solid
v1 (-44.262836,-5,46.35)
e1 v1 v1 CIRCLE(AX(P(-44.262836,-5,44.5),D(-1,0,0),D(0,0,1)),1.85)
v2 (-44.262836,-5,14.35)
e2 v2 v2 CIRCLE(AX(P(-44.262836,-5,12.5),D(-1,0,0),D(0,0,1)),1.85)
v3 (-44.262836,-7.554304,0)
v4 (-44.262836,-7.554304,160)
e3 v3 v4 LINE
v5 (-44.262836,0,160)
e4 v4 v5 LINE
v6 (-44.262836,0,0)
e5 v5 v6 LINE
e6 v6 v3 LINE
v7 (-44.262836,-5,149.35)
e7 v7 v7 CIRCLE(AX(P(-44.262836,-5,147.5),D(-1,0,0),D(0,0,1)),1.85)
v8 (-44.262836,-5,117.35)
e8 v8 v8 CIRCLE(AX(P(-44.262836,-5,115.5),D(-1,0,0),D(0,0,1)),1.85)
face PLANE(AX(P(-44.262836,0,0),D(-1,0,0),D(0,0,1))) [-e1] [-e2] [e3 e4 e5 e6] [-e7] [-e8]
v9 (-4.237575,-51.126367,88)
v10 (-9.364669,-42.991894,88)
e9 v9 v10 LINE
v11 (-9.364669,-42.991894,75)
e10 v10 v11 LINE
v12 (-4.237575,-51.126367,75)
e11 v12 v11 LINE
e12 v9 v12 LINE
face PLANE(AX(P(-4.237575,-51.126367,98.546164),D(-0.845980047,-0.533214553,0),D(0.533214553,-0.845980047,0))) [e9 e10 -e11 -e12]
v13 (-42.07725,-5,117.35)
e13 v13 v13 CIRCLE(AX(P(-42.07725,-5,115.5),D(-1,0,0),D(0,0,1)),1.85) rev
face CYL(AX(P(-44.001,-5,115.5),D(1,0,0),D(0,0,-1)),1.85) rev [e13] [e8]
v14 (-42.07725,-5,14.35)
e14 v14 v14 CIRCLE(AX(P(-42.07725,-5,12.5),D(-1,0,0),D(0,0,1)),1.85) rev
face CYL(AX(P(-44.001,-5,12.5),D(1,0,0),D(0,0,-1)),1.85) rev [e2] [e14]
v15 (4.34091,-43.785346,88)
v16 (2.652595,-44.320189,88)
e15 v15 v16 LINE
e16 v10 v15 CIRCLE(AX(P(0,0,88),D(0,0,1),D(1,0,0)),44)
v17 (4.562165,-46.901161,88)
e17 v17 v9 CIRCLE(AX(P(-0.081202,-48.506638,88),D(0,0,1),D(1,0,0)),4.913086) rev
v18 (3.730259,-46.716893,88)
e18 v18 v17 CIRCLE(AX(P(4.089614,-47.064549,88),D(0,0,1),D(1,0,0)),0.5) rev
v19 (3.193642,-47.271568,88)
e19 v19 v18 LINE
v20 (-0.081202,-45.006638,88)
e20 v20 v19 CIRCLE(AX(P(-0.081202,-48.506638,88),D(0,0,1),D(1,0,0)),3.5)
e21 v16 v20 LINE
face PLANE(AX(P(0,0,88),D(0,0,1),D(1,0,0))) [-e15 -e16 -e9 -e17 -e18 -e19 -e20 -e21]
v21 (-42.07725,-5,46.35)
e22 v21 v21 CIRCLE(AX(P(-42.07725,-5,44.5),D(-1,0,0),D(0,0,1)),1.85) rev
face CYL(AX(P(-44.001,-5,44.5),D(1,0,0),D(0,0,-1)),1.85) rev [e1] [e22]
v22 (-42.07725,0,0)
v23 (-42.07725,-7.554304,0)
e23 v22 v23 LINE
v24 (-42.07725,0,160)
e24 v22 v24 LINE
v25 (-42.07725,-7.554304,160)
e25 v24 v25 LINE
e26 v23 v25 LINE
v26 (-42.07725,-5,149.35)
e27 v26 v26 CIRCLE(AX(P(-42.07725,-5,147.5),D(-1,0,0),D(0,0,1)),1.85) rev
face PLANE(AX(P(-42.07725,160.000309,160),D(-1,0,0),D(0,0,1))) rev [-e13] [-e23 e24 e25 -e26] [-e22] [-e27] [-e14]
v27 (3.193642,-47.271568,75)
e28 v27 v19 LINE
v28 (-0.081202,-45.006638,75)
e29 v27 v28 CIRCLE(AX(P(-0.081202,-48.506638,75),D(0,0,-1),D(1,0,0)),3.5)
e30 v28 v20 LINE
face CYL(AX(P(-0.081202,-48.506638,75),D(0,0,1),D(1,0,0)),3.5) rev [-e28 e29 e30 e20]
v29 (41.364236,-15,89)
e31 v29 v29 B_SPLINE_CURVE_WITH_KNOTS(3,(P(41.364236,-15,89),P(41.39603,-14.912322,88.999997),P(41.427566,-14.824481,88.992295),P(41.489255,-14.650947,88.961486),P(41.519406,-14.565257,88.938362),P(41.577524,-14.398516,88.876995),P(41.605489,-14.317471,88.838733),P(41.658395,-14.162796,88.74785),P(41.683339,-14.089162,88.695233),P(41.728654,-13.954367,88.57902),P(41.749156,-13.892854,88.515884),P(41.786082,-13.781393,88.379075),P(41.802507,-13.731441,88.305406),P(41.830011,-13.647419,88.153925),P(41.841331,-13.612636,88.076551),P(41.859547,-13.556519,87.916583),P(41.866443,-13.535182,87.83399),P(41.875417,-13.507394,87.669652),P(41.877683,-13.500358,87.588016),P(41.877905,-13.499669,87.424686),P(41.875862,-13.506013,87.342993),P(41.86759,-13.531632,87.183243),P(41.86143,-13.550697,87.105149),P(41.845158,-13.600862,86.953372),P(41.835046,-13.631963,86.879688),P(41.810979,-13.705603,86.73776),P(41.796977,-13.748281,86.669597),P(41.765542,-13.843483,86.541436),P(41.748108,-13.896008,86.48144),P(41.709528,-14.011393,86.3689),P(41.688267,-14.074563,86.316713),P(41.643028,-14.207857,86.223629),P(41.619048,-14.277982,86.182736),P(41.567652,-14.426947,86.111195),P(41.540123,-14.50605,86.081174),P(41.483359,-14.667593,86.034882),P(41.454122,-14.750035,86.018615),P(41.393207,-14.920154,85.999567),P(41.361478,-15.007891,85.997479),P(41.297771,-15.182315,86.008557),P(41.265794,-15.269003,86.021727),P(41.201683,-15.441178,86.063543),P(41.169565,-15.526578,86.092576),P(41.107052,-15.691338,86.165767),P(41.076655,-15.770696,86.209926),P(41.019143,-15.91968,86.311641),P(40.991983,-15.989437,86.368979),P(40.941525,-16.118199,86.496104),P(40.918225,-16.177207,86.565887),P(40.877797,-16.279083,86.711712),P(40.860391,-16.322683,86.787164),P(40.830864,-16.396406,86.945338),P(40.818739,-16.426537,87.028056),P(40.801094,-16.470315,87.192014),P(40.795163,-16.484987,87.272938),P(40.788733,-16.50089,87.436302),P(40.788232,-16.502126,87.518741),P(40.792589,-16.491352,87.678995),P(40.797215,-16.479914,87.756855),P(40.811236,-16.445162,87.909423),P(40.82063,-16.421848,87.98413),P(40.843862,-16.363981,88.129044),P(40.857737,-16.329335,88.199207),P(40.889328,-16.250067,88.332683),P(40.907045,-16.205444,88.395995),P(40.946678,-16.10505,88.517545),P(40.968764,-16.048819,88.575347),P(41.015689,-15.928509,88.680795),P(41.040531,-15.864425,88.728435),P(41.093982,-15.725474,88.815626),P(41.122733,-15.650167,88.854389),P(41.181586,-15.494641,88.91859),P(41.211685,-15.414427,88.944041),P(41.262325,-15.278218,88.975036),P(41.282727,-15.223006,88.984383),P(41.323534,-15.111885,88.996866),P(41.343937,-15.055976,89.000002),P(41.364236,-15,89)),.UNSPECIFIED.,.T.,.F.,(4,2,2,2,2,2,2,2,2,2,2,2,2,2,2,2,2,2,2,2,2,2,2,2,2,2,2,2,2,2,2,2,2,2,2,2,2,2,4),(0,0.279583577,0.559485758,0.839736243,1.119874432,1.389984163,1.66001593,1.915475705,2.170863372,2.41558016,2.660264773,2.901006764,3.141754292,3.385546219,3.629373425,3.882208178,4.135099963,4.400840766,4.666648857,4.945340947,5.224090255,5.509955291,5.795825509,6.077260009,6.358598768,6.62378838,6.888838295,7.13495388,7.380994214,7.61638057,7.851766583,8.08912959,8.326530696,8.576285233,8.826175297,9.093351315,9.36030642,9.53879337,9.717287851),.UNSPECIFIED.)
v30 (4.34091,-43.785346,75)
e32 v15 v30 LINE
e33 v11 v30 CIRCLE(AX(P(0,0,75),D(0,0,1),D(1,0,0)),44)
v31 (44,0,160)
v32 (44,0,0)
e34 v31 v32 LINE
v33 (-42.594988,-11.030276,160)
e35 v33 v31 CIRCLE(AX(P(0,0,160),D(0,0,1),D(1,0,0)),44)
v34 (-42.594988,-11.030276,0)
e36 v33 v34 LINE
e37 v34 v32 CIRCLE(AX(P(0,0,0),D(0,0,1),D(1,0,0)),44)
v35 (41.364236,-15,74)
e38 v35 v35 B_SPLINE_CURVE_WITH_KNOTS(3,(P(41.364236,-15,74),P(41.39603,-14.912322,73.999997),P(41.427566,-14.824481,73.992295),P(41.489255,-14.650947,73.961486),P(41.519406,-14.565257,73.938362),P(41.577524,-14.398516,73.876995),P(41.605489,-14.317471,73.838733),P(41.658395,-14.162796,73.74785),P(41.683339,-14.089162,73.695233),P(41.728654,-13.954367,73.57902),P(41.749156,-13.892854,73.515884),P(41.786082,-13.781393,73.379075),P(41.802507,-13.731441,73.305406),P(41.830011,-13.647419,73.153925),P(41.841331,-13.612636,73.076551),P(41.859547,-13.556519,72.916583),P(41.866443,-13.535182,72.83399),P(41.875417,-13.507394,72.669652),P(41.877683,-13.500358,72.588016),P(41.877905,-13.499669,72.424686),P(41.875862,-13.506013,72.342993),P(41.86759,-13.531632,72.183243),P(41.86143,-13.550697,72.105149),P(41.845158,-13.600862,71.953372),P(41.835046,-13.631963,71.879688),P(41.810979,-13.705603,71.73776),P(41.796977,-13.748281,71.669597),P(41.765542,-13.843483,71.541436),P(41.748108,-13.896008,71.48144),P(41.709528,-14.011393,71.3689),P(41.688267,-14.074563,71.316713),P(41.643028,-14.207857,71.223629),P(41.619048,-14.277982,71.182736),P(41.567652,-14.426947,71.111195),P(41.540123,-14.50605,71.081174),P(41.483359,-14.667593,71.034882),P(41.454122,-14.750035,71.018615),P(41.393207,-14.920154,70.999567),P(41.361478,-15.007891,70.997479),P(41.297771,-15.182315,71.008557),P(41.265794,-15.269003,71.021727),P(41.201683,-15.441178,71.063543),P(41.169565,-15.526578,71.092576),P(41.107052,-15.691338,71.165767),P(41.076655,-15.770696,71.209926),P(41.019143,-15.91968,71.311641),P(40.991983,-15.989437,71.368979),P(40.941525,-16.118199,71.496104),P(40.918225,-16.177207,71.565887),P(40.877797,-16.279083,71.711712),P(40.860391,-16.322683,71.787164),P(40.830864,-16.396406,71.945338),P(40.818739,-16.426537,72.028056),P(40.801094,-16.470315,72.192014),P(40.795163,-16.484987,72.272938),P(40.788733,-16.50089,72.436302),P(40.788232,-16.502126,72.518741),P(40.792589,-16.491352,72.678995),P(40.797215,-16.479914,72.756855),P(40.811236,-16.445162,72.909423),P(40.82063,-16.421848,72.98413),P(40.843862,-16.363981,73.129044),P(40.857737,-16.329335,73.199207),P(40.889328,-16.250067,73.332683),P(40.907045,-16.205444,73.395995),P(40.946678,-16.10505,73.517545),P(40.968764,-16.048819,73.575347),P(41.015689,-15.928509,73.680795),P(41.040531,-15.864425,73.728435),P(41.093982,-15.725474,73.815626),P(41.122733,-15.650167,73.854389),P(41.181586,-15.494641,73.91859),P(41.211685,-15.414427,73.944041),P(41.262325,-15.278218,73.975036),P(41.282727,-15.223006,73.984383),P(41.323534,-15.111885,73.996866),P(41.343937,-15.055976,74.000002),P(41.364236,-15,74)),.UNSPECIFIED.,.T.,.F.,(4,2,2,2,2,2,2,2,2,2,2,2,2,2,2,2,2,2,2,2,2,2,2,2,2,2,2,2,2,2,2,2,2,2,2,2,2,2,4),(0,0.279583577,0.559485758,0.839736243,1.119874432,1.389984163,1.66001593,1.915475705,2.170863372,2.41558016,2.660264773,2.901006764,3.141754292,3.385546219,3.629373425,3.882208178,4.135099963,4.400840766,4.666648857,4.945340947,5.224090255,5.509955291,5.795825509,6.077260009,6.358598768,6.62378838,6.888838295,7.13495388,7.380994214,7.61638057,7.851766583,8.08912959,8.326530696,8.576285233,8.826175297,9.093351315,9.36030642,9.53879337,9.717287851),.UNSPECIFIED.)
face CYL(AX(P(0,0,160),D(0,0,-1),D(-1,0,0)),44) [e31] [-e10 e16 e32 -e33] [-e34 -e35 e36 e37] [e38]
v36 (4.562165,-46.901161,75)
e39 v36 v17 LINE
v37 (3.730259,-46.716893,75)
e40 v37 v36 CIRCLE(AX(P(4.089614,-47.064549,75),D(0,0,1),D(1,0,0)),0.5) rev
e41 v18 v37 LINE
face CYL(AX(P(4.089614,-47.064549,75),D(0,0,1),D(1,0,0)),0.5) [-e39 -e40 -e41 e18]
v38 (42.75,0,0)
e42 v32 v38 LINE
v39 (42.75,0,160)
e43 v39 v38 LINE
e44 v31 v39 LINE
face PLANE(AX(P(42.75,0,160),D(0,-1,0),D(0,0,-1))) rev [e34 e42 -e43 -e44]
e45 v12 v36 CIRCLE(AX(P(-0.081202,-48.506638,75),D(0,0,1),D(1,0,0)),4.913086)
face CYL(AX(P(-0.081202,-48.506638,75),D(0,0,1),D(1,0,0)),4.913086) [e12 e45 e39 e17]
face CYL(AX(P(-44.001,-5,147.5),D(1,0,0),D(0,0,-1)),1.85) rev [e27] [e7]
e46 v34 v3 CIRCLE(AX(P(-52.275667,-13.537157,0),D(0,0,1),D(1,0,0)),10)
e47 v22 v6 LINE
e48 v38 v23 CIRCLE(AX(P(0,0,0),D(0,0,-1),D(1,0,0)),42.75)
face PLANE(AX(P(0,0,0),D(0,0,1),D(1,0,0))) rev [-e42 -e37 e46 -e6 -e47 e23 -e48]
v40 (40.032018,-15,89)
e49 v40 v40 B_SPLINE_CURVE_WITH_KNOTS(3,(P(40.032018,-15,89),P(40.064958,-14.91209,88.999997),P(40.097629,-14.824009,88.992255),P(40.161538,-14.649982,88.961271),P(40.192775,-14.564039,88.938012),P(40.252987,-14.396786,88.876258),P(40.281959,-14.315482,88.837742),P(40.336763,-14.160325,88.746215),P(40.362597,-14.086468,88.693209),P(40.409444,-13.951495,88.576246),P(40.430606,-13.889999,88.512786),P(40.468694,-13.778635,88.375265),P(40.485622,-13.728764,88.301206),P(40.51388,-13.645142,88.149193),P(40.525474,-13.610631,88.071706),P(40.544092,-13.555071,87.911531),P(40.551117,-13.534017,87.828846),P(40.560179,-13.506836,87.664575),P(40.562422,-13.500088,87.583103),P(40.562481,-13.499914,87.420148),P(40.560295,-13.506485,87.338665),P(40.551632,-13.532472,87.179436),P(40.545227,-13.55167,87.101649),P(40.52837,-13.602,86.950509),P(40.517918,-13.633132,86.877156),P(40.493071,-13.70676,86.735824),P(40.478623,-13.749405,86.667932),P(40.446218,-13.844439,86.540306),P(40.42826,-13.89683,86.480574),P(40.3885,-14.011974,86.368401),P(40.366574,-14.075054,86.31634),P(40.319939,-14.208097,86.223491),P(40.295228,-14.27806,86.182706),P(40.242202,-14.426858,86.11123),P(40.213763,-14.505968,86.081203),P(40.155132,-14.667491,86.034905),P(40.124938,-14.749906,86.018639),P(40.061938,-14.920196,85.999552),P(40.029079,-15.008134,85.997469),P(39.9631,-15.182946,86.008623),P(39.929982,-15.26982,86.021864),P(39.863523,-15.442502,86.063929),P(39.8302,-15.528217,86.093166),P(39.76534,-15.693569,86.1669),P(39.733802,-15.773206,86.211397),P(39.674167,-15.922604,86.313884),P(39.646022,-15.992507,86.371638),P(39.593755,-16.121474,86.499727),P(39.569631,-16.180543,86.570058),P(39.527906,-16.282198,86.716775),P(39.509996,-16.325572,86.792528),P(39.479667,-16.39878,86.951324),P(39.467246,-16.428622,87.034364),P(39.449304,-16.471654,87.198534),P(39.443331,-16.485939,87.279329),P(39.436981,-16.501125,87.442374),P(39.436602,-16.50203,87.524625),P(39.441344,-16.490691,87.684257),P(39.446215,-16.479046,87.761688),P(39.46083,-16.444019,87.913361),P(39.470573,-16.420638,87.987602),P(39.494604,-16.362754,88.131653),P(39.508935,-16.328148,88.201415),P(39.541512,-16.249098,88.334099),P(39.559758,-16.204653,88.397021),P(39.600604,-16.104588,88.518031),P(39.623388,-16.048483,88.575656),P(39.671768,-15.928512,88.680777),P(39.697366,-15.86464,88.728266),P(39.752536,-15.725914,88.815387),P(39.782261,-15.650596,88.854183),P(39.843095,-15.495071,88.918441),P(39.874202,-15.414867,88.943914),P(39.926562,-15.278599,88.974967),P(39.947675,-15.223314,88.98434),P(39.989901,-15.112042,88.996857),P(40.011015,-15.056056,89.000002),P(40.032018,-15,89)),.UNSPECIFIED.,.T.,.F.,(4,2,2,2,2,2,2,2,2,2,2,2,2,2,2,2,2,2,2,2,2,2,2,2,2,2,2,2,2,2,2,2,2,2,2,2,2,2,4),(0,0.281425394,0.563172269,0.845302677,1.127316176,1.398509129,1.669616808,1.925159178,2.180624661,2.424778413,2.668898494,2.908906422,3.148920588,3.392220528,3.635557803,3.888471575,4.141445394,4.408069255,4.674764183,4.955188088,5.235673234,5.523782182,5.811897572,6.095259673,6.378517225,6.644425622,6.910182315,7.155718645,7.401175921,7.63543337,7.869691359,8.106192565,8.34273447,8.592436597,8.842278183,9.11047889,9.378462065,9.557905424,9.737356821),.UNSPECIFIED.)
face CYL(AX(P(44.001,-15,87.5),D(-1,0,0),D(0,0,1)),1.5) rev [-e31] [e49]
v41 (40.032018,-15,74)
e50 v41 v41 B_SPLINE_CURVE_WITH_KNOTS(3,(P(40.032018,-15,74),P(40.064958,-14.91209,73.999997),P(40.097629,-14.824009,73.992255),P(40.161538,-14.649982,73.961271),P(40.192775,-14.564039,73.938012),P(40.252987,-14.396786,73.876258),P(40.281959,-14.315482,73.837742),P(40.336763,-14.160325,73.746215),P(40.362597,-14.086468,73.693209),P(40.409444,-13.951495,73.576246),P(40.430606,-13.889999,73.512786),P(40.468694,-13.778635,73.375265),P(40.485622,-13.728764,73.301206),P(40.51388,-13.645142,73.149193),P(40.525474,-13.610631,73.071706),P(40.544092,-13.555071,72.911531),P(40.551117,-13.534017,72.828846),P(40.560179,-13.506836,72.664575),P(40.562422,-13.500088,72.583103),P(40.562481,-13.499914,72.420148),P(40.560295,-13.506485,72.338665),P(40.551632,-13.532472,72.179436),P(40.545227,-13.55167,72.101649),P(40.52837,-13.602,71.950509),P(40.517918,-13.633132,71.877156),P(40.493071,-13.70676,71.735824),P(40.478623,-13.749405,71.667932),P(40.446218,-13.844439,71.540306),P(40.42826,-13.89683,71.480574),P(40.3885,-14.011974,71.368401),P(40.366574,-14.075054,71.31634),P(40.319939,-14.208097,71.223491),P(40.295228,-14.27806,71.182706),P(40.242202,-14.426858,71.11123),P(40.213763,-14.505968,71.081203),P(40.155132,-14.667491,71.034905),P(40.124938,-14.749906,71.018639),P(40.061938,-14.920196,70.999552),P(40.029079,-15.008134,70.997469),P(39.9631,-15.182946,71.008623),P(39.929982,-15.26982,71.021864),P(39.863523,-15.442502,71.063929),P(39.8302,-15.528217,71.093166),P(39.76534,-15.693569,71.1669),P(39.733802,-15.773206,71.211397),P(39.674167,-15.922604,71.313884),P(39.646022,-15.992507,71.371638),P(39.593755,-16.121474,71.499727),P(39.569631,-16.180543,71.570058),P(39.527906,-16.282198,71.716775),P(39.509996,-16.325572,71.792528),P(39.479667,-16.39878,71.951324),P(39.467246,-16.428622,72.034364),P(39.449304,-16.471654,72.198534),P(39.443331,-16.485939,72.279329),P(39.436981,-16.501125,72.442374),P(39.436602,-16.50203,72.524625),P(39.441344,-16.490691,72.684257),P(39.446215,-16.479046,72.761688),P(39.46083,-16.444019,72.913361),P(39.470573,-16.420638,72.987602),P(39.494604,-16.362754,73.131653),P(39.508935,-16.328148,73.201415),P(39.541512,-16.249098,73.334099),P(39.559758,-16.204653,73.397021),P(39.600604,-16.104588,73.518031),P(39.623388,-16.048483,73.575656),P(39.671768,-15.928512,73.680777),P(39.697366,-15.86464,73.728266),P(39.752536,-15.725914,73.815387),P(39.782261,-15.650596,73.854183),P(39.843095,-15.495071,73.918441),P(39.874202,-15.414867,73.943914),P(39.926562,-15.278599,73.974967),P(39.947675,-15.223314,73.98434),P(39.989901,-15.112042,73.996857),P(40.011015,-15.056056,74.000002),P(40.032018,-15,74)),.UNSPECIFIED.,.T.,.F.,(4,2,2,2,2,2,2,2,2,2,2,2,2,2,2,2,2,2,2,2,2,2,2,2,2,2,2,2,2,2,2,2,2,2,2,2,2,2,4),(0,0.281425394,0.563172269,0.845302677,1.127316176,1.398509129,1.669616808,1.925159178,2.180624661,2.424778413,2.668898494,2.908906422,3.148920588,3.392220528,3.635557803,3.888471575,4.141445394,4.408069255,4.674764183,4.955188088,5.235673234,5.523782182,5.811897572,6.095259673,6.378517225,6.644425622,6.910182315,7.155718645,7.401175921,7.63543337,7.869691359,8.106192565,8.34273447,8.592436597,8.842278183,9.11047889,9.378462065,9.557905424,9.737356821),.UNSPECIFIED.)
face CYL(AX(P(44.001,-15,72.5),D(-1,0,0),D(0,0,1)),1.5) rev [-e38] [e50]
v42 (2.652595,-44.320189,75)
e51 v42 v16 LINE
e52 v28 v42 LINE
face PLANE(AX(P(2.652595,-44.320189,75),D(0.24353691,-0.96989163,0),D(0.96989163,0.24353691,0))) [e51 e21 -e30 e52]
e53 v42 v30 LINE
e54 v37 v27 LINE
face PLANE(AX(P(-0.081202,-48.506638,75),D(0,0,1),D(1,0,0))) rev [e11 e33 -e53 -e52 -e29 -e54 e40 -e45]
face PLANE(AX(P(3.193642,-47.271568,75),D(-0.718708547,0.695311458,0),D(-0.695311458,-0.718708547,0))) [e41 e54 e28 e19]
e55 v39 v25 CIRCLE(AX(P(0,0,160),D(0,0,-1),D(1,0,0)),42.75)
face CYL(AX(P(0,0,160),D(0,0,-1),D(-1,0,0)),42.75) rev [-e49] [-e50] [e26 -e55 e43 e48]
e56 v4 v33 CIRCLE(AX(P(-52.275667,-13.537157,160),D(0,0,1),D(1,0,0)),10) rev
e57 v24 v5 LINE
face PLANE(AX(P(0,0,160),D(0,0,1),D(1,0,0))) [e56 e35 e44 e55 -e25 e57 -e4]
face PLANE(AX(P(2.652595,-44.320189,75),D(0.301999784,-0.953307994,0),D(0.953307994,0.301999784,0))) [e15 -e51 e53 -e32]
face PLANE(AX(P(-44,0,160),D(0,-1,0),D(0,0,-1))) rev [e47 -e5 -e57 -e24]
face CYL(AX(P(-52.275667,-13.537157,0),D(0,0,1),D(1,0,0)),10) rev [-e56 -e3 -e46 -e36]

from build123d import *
from build123d.topology import SkipClean

# Parameters (mm, degrees)
BOSS_EXTRUDE1_DEPTH      = 160
CUT_EXTRUDE1_REACH       = 173.674
CUT_EXTRUDE1_END_RADIUS  = 44
SKETCH2_R                = 1.85
BOSS_EXTRUDE2_DEPTH      = 7.5
BOSS_EXTRUDE2_DEPTH_BACK = 7.5
CUT_EXTRUDE2_START       = -160
SKETCH5_W                = 1.237164205
SKETCH5_H                = 7.554303916
CUT_EXTRUDE2_DEPTH       = 160
SKETCH6_W                = 160
SKETCH6_H                = 7.554303916
SKETCH6_R                = 1.85
BOSS_EXTRUDE3_DEPTH      = 0.5
BOSS_EXTRUDE4_DEPTH      = 85
FILLET3_R                = 0.5
CUT_EXTRUDE4_REACH       = 176.326
CUT_EXTRUDE4_END_RADIUS  = 44
SKETCH9_W                = 12
SKETCH9_H                = 6
CUT_EXTRUDE5_DEPTH       = 72
CUT_EXTRUDE6_START       = -160
CUT_EXTRUDE6_DEPTH       = 160
BOSS_EXTRUDE5_DEPTH      = 1
BOSS_EXTRUDE5_DEPTH_BACK = 1.5
SKETCH14_W               = 160
SKETCH14_H               = 7.554303916
SKETCH14_R               = 1.85
SKETCH17_W               = 0.3144145
SKETCH17_H               = 160
CUT_EXTRUDE8_DEPTH       = 7.554303916
FILLET4_R                = 10
SKETCH18_W               = 5.679513367
SKETCH18_H               = 15.054755776
CUT_EXTRUDE9_DEPTH       = 15
CUT_EXTRUDE10_REACH      = 211.375
CUT_EXTRUDE10_END_RADIUS = 44
CUT_EXTRUDE10_START      = 20
SKETCH19_R               = 1.5
BOSS_EXTRUDE6_DEPTH      = 13


with BuildPart() as part:
    # Sketch1 → Boss-Extrude1 (new body)
    with BuildSketch(Plane.XY):
        with BuildLine():
            Line((-44, 0), (-42.75, 0))
            ThreePointArc((-42.75, 0), (0, -42.75), (42.75, 0))
            Line((42.75, 0), (44, 0))
            ThreePointArc((44, 0), (0, -44), (-44, 0))
        make_face()
    extrude(amount=BOSS_EXTRUDE1_DEPTH)

    # Cut-Extrude1: up to this cylinder (the profile starts inside it)
    cut_extrude1_end = Plane(origin=(0, 0, 80), z_dir=(0, 0, -1)) * Cylinder(CUT_EXTRUDE1_END_RADIUS, 571.348, mode=Mode.PRIVATE)
    # Sketch2 → Cut-Extrude1 (cut, up to the surface)
    with BuildSketch(Plane(origin=(0, 0, 0), x_dir=(0, 0, -1), z_dir=(1, 0, 0)), mode=Mode.PRIVATE) as cut_extrude1_sk1:
        with Locations((-147.5, -5)):
            Circle(SKETCH2_R)
    cut_extrude1_tool1 = extrude(cut_extrude1_sk1.sketch, amount=-CUT_EXTRUDE1_REACH, mode=Mode.PRIVATE) & cut_extrude1_end
    add(cut_extrude1_tool1.solids().sort_by_distance((0, -5, 147.5))[0], mode=Mode.SUBTRACT)
    # Sketch2 → Cut-Extrude1 (cut, up to the surface)
    with BuildSketch(Plane(origin=(0, 0, 0), x_dir=(0, 0, -1), z_dir=(1, 0, 0)), mode=Mode.PRIVATE) as cut_extrude1_sk2:
        with Locations((-115.5, -5)):
            Circle(SKETCH2_R)
    cut_extrude1_tool2 = extrude(cut_extrude1_sk2.sketch, amount=-CUT_EXTRUDE1_REACH, mode=Mode.PRIVATE) & cut_extrude1_end
    add(cut_extrude1_tool2.solids().sort_by_distance((0, -5, 115.5))[0], mode=Mode.SUBTRACT)
    # Sketch2 → Cut-Extrude1 (cut, up to the surface)
    with BuildSketch(Plane(origin=(0, 0, 0), x_dir=(0, 0, -1), z_dir=(1, 0, 0)), mode=Mode.PRIVATE) as cut_extrude1_sk3:
        with Locations((-44.5, -5)):
            Circle(SKETCH2_R)
    cut_extrude1_tool3 = extrude(cut_extrude1_sk3.sketch, amount=-CUT_EXTRUDE1_REACH, mode=Mode.PRIVATE) & cut_extrude1_end
    add(cut_extrude1_tool3.solids().sort_by_distance((0, -5, 44.5))[0], mode=Mode.SUBTRACT)
    # Sketch2 → Cut-Extrude1 (cut, up to the surface)
    with BuildSketch(Plane(origin=(0, 0, 0), x_dir=(0, 0, -1), z_dir=(1, 0, 0)), mode=Mode.PRIVATE) as cut_extrude1_sk4:
        with Locations((-12.5, -5)):
            Circle(SKETCH2_R)
    cut_extrude1_tool4 = extrude(cut_extrude1_sk4.sketch, amount=-CUT_EXTRUDE1_REACH, mode=Mode.PRIVATE) & cut_extrude1_end
    add(cut_extrude1_tool4.solids().sort_by_distance((0, -5, 12.5))[0], mode=Mode.SUBTRACT)

    # Sketch4 → Boss-Extrude2 (add, two sides: drawn at the far end of the back side and taken through both)
    with SkipClean():  # the faces are left unmerged after this step: merging them gives an invalid solid
        with BuildSketch(Plane(origin=(0, 0, 72), x_dir=(-1, 0, 0), z_dir=(0, 0, -1)).offset(-BOSS_EXTRUDE2_DEPTH_BACK)):
            with BuildLine():
                Line((-42.188440557, 12.495418496), (-40.883089617, 12.495418496))
                ThreePointArc((-40.883089617, 12.495418496), (-42.280696429, 6.317057024), (-42.75, 0))
                Line((-42.75, 0), (-44, 0))
                ThreePointArc((-44, 0), (-43.544755049, 6.31302683), (-42.188440557, 12.495418496))
            make_face()
        extrude(amount=BOSS_EXTRUDE2_DEPTH + BOSS_EXTRUDE2_DEPTH_BACK)

    # Sketch5 → Cut-Extrude2 (cut)
    with SkipClean():  # the faces are left unmerged after this step: merging them gives an invalid solid
        with BuildSketch(Plane.XY.offset(160).offset(CUT_EXTRUDE2_START)):
            with Locations((-43.381417898, -3.777151958)):
                Rectangle(SKETCH5_W, SKETCH5_H)
        extrude(amount=CUT_EXTRUDE2_DEPTH, mode=Mode.SUBTRACT)

    # Sketch6 → Boss-Extrude3 (add)
    with SkipClean():  # the faces are left unmerged after this step: merging them gives an invalid solid
        with BuildSketch(Plane.ZY.offset(42.762835795)):
            with Locations((80, -3.777151958)):
                Rectangle(SKETCH6_W, SKETCH6_H)
            with Locations((12.5, -5)):
                Circle(SKETCH6_R, mode=Mode.SUBTRACT)
            with Locations((44.5, -5)):
                Circle(SKETCH6_R, mode=Mode.SUBTRACT)
            with Locations((115.5, -5)):
                Circle(SKETCH6_R, mode=Mode.SUBTRACT)
            with Locations((147.5, -5)):
                Circle(SKETCH6_R, mode=Mode.SUBTRACT)
        extrude(amount=BOSS_EXTRUDE3_DEPTH)

    # Sketch7 → Boss-Extrude4 (add)
    with SkipClean():  # the faces are left unmerged after this step: merging them gives an invalid solid
        with BuildSketch(Plane.XY.offset(160)):
            with BuildLine():
                Line((3.193641617, -47.271567965), (4.247348412, -46.182404151))
                ThreePointArc((4.247348412, -46.182404151), (-1.361382554, -53.250007087), (-2.652595344, -44.320189404))
                Line((-2.652595344, -44.320189404), (-7.064595581, -42.922505627))
                ThreePointArc((-7.064595581, -42.922505627), (0, -43.5), (7.064595581, -42.922505627))
                Line((7.064595581, -42.922505627), (2.652595344, -44.320189404))
                Line((2.652595344, -44.320189404), (-0.081202248, -45.006637866))
                ThreePointArc((-0.081202248, -45.006637866), (-2.072088401, -51.385243836), (3.193641617, -47.271567965))
            make_face()
        extrude(amount=-BOSS_EXTRUDE4_DEPTH)

    # Fillet3
    fillet3_edges = [part.edges().sort_by_distance(p)[0] for p in [
        (4.247348412, -46.182404151, 117.5),
    ]]
    fillet(fillet3_edges, radius=FILLET3_R)

    # Cut-Extrude4: up to this cylinder (the profile starts inside it)
    with SkipClean():  # the faces are left unmerged after this step: merging them gives an invalid solid
        cut_extrude4_end = Plane(origin=(0, 0, 72), z_dir=(0, 0, -1)) * Cylinder(CUT_EXTRUDE4_END_RADIUS, 441.652, mode=Mode.PRIVATE)
        # Sketch9 → Cut-Extrude4 (cut, up to the surface)
        with BuildSketch(Plane(origin=(0, 0, 0), x_dir=(0, 0, -1), z_dir=(1, 0, 0)), mode=Mode.PRIVATE) as cut_extrude4_sk1:
            with Locations((-72, 5.495418496)):
                Rectangle(SKETCH9_W, SKETCH9_H)
        cut_extrude4_tool1 = extrude(cut_extrude4_sk1.sketch, amount=CUT_EXTRUDE4_REACH, mode=Mode.PRIVATE) & cut_extrude4_end
        add(cut_extrude4_tool1.solids().sort_by_distance((0, 5.495418, 72))[0], mode=Mode.SUBTRACT)

    # Sketch11 → Cut-Extrude5 (cut)
    with SkipClean():  # the faces are left unmerged after this step: merging them gives an invalid solid
        with BuildSketch(Plane.XY.offset(160)):
            with BuildLine():
                Line((6.038191003, -53.758519386), (4.340910446, -43.785345682))
                ThreePointArc((4.340910446, -43.785345682), (0, -44), (-4.340910446, -43.785345682))
                Line((-4.340910446, -43.785345682), (-6.663752415, -46.7537351))
                ThreePointArc((-6.663752415, -46.7537351), (-2.196447495, -53.671825429), (6.038191003, -53.758519386))
            make_face()
        extrude(amount=-CUT_EXTRUDE5_DEPTH, mode=Mode.SUBTRACT)

    # Sketch12 → Cut-Extrude6 (cut)
    with SkipClean():  # the faces are left unmerged after this step: merging them gives an invalid solid
        with BuildSketch(Plane(origin=(0, 0, 0), x_dir=(-1, 0, 0), z_dir=(0, 0, -1)).offset(CUT_EXTRUDE6_START)):
            Polygon((42.75, 0), (42.75, -7.554303916), (41.523020522, -7.554303916), align=None)
        extrude(amount=CUT_EXTRUDE6_DEPTH, mode=Mode.SUBTRACT)

    # Sketch14 → Boss-Extrude5 (add, two sides: drawn at the far end of the back side and taken through both)
    with SkipClean():  # the faces are left unmerged after this step: merging them gives an invalid solid
        with BuildSketch(Plane.ZY.offset(43.262835795).offset(-BOSS_EXTRUDE5_DEPTH_BACK)):
            with Locations((80, -3.777151958)):
                Rectangle(SKETCH14_W, SKETCH14_H)
            with Locations((12.5, -5)):
                Circle(SKETCH14_R, mode=Mode.SUBTRACT)
            with Locations((44.5, -5)):
                Circle(SKETCH14_R, mode=Mode.SUBTRACT)
            with Locations((115.5, -5)):
                Circle(SKETCH14_R, mode=Mode.SUBTRACT)
            with Locations((147.5, -5)):
                Circle(SKETCH14_R, mode=Mode.SUBTRACT)
        extrude(amount=BOSS_EXTRUDE5_DEPTH + BOSS_EXTRUDE5_DEPTH_BACK)

    # Sketch17 → Cut-Extrude8 (cut)
    with SkipClean():  # the faces are left unmerged after this step: merging them gives an invalid solid
        with BuildSketch(Plane.XZ.offset(7.554303916)):
            with Locations((-41.920043045, 80)):
                Rectangle(SKETCH17_W, SKETCH17_H)
        extrude(amount=-CUT_EXTRUDE8_DEPTH, mode=Mode.SUBTRACT)

    # Fillet4
    # the kernel refuses this fillet: 10 mm, written as the material it adds along each edge
    with BuildSketch(Plane(origin=(-43.346654915, -7.554303916, 160), x_dir=(0.21136107775555732, -0.9774080492864836, 0), z_dir=(0, 0, -1))) as fillet4_piece_1:
        with BuildLine():
            CenterArc((3.960443366, 9.991830737), FILLET4_R, 245.454934631, 22.228958211)
            Line((-0.193644978, 0.895482567), (-0.276726745, 0.713555603))
            ThreePointArc((-0.276726745, 0.713555603), (-0.292304099, 0.405469068), (-0.19548161, -0.042272216))
            Line((-0.19548161, -0.042272216), (0.008082537, -0.199836615))
            ThreePointArc((0.008082537, -0.199836615), (1.778158246, -0.164055241), (3.548233954, -0.199836615))
            Line((3.548233954, -0.199836615), (3.556316492, 0))
        make_face()
    extrude(amount=160)

    # Sketch18 → Cut-Extrude9 (cut)
    with BuildSketch(Plane.XY.offset(79.5)):
        with Locations((42.974138408, 7.527377888)):
            Rectangle(SKETCH18_W, SKETCH18_H)
    extrude(amount=-CUT_EXTRUDE9_DEPTH, mode=Mode.SUBTRACT)

    # Cut-Extrude10: up to this cylinder (the profile starts inside it)
    cut_extrude10_end = Plane(origin=(0, 0, 80), z_dir=(0, 0, -1)) * Cylinder(CUT_EXTRUDE10_END_RADIUS, 526.75, mode=Mode.PRIVATE)
    # Sketch19 → Cut-Extrude10 (cut, up to the surface)
    with BuildSketch(Plane(origin=(-42.077250295, 0, 0), x_dir=(0, 0, -1), z_dir=(1, 0, 0)).offset(CUT_EXTRUDE10_START), mode=Mode.PRIVATE) as cut_extrude10_sk1:
        with Locations(Location((-87.5, -15, 0), (0, 0, 180))):
            Circle(SKETCH19_R)
    cut_extrude10_tool1 = extrude(cut_extrude10_sk1.sketch, amount=CUT_EXTRUDE10_REACH, mode=Mode.PRIVATE) & cut_extrude10_end
    add(cut_extrude10_tool1.solids().sort_by_distance((-22.07725, -15, 87.5))[0], mode=Mode.SUBTRACT)
    # Sketch19 → Cut-Extrude10 (cut, up to the surface)
    with BuildSketch(Plane(origin=(-42.077250295, 0, 0), x_dir=(0, 0, -1), z_dir=(1, 0, 0)).offset(CUT_EXTRUDE10_START), mode=Mode.PRIVATE) as cut_extrude10_sk2:
        with Locations(Location((-72.5, -15, 0), (0, 0, 180))):
            Circle(SKETCH19_R)
    cut_extrude10_tool2 = extrude(cut_extrude10_sk2.sketch, amount=CUT_EXTRUDE10_REACH, mode=Mode.PRIVATE) & cut_extrude10_end
    add(cut_extrude10_tool2.solids().sort_by_distance((-22.07725, -15, 72.5))[0], mode=Mode.SUBTRACT)

    # Sketch20 → Boss-Extrude6 (add)
    with BuildSketch(Plane(origin=(0, 0, 75), x_dir=(-1, 0, 0), z_dir=(0, 0, -1))):
        with BuildLine():
            Line((4.237574899, -51.126366777), (9.364668734, -42.991894347))
            ThreePointArc((9.364668734, -42.991894347), (6.86426372, -43.461268776), (4.340910446, -43.785345682))
            Line((4.340910446, -43.785345682), (2.652595344, -44.320189404))
            ThreePointArc((2.652595344, -44.320189404), (4.866254034, -47.392325259), (4.237574899, -51.126366777))
        make_face()
    extrude(amount=-BOSS_EXTRUDE6_DEPTH)


solid = part.part
